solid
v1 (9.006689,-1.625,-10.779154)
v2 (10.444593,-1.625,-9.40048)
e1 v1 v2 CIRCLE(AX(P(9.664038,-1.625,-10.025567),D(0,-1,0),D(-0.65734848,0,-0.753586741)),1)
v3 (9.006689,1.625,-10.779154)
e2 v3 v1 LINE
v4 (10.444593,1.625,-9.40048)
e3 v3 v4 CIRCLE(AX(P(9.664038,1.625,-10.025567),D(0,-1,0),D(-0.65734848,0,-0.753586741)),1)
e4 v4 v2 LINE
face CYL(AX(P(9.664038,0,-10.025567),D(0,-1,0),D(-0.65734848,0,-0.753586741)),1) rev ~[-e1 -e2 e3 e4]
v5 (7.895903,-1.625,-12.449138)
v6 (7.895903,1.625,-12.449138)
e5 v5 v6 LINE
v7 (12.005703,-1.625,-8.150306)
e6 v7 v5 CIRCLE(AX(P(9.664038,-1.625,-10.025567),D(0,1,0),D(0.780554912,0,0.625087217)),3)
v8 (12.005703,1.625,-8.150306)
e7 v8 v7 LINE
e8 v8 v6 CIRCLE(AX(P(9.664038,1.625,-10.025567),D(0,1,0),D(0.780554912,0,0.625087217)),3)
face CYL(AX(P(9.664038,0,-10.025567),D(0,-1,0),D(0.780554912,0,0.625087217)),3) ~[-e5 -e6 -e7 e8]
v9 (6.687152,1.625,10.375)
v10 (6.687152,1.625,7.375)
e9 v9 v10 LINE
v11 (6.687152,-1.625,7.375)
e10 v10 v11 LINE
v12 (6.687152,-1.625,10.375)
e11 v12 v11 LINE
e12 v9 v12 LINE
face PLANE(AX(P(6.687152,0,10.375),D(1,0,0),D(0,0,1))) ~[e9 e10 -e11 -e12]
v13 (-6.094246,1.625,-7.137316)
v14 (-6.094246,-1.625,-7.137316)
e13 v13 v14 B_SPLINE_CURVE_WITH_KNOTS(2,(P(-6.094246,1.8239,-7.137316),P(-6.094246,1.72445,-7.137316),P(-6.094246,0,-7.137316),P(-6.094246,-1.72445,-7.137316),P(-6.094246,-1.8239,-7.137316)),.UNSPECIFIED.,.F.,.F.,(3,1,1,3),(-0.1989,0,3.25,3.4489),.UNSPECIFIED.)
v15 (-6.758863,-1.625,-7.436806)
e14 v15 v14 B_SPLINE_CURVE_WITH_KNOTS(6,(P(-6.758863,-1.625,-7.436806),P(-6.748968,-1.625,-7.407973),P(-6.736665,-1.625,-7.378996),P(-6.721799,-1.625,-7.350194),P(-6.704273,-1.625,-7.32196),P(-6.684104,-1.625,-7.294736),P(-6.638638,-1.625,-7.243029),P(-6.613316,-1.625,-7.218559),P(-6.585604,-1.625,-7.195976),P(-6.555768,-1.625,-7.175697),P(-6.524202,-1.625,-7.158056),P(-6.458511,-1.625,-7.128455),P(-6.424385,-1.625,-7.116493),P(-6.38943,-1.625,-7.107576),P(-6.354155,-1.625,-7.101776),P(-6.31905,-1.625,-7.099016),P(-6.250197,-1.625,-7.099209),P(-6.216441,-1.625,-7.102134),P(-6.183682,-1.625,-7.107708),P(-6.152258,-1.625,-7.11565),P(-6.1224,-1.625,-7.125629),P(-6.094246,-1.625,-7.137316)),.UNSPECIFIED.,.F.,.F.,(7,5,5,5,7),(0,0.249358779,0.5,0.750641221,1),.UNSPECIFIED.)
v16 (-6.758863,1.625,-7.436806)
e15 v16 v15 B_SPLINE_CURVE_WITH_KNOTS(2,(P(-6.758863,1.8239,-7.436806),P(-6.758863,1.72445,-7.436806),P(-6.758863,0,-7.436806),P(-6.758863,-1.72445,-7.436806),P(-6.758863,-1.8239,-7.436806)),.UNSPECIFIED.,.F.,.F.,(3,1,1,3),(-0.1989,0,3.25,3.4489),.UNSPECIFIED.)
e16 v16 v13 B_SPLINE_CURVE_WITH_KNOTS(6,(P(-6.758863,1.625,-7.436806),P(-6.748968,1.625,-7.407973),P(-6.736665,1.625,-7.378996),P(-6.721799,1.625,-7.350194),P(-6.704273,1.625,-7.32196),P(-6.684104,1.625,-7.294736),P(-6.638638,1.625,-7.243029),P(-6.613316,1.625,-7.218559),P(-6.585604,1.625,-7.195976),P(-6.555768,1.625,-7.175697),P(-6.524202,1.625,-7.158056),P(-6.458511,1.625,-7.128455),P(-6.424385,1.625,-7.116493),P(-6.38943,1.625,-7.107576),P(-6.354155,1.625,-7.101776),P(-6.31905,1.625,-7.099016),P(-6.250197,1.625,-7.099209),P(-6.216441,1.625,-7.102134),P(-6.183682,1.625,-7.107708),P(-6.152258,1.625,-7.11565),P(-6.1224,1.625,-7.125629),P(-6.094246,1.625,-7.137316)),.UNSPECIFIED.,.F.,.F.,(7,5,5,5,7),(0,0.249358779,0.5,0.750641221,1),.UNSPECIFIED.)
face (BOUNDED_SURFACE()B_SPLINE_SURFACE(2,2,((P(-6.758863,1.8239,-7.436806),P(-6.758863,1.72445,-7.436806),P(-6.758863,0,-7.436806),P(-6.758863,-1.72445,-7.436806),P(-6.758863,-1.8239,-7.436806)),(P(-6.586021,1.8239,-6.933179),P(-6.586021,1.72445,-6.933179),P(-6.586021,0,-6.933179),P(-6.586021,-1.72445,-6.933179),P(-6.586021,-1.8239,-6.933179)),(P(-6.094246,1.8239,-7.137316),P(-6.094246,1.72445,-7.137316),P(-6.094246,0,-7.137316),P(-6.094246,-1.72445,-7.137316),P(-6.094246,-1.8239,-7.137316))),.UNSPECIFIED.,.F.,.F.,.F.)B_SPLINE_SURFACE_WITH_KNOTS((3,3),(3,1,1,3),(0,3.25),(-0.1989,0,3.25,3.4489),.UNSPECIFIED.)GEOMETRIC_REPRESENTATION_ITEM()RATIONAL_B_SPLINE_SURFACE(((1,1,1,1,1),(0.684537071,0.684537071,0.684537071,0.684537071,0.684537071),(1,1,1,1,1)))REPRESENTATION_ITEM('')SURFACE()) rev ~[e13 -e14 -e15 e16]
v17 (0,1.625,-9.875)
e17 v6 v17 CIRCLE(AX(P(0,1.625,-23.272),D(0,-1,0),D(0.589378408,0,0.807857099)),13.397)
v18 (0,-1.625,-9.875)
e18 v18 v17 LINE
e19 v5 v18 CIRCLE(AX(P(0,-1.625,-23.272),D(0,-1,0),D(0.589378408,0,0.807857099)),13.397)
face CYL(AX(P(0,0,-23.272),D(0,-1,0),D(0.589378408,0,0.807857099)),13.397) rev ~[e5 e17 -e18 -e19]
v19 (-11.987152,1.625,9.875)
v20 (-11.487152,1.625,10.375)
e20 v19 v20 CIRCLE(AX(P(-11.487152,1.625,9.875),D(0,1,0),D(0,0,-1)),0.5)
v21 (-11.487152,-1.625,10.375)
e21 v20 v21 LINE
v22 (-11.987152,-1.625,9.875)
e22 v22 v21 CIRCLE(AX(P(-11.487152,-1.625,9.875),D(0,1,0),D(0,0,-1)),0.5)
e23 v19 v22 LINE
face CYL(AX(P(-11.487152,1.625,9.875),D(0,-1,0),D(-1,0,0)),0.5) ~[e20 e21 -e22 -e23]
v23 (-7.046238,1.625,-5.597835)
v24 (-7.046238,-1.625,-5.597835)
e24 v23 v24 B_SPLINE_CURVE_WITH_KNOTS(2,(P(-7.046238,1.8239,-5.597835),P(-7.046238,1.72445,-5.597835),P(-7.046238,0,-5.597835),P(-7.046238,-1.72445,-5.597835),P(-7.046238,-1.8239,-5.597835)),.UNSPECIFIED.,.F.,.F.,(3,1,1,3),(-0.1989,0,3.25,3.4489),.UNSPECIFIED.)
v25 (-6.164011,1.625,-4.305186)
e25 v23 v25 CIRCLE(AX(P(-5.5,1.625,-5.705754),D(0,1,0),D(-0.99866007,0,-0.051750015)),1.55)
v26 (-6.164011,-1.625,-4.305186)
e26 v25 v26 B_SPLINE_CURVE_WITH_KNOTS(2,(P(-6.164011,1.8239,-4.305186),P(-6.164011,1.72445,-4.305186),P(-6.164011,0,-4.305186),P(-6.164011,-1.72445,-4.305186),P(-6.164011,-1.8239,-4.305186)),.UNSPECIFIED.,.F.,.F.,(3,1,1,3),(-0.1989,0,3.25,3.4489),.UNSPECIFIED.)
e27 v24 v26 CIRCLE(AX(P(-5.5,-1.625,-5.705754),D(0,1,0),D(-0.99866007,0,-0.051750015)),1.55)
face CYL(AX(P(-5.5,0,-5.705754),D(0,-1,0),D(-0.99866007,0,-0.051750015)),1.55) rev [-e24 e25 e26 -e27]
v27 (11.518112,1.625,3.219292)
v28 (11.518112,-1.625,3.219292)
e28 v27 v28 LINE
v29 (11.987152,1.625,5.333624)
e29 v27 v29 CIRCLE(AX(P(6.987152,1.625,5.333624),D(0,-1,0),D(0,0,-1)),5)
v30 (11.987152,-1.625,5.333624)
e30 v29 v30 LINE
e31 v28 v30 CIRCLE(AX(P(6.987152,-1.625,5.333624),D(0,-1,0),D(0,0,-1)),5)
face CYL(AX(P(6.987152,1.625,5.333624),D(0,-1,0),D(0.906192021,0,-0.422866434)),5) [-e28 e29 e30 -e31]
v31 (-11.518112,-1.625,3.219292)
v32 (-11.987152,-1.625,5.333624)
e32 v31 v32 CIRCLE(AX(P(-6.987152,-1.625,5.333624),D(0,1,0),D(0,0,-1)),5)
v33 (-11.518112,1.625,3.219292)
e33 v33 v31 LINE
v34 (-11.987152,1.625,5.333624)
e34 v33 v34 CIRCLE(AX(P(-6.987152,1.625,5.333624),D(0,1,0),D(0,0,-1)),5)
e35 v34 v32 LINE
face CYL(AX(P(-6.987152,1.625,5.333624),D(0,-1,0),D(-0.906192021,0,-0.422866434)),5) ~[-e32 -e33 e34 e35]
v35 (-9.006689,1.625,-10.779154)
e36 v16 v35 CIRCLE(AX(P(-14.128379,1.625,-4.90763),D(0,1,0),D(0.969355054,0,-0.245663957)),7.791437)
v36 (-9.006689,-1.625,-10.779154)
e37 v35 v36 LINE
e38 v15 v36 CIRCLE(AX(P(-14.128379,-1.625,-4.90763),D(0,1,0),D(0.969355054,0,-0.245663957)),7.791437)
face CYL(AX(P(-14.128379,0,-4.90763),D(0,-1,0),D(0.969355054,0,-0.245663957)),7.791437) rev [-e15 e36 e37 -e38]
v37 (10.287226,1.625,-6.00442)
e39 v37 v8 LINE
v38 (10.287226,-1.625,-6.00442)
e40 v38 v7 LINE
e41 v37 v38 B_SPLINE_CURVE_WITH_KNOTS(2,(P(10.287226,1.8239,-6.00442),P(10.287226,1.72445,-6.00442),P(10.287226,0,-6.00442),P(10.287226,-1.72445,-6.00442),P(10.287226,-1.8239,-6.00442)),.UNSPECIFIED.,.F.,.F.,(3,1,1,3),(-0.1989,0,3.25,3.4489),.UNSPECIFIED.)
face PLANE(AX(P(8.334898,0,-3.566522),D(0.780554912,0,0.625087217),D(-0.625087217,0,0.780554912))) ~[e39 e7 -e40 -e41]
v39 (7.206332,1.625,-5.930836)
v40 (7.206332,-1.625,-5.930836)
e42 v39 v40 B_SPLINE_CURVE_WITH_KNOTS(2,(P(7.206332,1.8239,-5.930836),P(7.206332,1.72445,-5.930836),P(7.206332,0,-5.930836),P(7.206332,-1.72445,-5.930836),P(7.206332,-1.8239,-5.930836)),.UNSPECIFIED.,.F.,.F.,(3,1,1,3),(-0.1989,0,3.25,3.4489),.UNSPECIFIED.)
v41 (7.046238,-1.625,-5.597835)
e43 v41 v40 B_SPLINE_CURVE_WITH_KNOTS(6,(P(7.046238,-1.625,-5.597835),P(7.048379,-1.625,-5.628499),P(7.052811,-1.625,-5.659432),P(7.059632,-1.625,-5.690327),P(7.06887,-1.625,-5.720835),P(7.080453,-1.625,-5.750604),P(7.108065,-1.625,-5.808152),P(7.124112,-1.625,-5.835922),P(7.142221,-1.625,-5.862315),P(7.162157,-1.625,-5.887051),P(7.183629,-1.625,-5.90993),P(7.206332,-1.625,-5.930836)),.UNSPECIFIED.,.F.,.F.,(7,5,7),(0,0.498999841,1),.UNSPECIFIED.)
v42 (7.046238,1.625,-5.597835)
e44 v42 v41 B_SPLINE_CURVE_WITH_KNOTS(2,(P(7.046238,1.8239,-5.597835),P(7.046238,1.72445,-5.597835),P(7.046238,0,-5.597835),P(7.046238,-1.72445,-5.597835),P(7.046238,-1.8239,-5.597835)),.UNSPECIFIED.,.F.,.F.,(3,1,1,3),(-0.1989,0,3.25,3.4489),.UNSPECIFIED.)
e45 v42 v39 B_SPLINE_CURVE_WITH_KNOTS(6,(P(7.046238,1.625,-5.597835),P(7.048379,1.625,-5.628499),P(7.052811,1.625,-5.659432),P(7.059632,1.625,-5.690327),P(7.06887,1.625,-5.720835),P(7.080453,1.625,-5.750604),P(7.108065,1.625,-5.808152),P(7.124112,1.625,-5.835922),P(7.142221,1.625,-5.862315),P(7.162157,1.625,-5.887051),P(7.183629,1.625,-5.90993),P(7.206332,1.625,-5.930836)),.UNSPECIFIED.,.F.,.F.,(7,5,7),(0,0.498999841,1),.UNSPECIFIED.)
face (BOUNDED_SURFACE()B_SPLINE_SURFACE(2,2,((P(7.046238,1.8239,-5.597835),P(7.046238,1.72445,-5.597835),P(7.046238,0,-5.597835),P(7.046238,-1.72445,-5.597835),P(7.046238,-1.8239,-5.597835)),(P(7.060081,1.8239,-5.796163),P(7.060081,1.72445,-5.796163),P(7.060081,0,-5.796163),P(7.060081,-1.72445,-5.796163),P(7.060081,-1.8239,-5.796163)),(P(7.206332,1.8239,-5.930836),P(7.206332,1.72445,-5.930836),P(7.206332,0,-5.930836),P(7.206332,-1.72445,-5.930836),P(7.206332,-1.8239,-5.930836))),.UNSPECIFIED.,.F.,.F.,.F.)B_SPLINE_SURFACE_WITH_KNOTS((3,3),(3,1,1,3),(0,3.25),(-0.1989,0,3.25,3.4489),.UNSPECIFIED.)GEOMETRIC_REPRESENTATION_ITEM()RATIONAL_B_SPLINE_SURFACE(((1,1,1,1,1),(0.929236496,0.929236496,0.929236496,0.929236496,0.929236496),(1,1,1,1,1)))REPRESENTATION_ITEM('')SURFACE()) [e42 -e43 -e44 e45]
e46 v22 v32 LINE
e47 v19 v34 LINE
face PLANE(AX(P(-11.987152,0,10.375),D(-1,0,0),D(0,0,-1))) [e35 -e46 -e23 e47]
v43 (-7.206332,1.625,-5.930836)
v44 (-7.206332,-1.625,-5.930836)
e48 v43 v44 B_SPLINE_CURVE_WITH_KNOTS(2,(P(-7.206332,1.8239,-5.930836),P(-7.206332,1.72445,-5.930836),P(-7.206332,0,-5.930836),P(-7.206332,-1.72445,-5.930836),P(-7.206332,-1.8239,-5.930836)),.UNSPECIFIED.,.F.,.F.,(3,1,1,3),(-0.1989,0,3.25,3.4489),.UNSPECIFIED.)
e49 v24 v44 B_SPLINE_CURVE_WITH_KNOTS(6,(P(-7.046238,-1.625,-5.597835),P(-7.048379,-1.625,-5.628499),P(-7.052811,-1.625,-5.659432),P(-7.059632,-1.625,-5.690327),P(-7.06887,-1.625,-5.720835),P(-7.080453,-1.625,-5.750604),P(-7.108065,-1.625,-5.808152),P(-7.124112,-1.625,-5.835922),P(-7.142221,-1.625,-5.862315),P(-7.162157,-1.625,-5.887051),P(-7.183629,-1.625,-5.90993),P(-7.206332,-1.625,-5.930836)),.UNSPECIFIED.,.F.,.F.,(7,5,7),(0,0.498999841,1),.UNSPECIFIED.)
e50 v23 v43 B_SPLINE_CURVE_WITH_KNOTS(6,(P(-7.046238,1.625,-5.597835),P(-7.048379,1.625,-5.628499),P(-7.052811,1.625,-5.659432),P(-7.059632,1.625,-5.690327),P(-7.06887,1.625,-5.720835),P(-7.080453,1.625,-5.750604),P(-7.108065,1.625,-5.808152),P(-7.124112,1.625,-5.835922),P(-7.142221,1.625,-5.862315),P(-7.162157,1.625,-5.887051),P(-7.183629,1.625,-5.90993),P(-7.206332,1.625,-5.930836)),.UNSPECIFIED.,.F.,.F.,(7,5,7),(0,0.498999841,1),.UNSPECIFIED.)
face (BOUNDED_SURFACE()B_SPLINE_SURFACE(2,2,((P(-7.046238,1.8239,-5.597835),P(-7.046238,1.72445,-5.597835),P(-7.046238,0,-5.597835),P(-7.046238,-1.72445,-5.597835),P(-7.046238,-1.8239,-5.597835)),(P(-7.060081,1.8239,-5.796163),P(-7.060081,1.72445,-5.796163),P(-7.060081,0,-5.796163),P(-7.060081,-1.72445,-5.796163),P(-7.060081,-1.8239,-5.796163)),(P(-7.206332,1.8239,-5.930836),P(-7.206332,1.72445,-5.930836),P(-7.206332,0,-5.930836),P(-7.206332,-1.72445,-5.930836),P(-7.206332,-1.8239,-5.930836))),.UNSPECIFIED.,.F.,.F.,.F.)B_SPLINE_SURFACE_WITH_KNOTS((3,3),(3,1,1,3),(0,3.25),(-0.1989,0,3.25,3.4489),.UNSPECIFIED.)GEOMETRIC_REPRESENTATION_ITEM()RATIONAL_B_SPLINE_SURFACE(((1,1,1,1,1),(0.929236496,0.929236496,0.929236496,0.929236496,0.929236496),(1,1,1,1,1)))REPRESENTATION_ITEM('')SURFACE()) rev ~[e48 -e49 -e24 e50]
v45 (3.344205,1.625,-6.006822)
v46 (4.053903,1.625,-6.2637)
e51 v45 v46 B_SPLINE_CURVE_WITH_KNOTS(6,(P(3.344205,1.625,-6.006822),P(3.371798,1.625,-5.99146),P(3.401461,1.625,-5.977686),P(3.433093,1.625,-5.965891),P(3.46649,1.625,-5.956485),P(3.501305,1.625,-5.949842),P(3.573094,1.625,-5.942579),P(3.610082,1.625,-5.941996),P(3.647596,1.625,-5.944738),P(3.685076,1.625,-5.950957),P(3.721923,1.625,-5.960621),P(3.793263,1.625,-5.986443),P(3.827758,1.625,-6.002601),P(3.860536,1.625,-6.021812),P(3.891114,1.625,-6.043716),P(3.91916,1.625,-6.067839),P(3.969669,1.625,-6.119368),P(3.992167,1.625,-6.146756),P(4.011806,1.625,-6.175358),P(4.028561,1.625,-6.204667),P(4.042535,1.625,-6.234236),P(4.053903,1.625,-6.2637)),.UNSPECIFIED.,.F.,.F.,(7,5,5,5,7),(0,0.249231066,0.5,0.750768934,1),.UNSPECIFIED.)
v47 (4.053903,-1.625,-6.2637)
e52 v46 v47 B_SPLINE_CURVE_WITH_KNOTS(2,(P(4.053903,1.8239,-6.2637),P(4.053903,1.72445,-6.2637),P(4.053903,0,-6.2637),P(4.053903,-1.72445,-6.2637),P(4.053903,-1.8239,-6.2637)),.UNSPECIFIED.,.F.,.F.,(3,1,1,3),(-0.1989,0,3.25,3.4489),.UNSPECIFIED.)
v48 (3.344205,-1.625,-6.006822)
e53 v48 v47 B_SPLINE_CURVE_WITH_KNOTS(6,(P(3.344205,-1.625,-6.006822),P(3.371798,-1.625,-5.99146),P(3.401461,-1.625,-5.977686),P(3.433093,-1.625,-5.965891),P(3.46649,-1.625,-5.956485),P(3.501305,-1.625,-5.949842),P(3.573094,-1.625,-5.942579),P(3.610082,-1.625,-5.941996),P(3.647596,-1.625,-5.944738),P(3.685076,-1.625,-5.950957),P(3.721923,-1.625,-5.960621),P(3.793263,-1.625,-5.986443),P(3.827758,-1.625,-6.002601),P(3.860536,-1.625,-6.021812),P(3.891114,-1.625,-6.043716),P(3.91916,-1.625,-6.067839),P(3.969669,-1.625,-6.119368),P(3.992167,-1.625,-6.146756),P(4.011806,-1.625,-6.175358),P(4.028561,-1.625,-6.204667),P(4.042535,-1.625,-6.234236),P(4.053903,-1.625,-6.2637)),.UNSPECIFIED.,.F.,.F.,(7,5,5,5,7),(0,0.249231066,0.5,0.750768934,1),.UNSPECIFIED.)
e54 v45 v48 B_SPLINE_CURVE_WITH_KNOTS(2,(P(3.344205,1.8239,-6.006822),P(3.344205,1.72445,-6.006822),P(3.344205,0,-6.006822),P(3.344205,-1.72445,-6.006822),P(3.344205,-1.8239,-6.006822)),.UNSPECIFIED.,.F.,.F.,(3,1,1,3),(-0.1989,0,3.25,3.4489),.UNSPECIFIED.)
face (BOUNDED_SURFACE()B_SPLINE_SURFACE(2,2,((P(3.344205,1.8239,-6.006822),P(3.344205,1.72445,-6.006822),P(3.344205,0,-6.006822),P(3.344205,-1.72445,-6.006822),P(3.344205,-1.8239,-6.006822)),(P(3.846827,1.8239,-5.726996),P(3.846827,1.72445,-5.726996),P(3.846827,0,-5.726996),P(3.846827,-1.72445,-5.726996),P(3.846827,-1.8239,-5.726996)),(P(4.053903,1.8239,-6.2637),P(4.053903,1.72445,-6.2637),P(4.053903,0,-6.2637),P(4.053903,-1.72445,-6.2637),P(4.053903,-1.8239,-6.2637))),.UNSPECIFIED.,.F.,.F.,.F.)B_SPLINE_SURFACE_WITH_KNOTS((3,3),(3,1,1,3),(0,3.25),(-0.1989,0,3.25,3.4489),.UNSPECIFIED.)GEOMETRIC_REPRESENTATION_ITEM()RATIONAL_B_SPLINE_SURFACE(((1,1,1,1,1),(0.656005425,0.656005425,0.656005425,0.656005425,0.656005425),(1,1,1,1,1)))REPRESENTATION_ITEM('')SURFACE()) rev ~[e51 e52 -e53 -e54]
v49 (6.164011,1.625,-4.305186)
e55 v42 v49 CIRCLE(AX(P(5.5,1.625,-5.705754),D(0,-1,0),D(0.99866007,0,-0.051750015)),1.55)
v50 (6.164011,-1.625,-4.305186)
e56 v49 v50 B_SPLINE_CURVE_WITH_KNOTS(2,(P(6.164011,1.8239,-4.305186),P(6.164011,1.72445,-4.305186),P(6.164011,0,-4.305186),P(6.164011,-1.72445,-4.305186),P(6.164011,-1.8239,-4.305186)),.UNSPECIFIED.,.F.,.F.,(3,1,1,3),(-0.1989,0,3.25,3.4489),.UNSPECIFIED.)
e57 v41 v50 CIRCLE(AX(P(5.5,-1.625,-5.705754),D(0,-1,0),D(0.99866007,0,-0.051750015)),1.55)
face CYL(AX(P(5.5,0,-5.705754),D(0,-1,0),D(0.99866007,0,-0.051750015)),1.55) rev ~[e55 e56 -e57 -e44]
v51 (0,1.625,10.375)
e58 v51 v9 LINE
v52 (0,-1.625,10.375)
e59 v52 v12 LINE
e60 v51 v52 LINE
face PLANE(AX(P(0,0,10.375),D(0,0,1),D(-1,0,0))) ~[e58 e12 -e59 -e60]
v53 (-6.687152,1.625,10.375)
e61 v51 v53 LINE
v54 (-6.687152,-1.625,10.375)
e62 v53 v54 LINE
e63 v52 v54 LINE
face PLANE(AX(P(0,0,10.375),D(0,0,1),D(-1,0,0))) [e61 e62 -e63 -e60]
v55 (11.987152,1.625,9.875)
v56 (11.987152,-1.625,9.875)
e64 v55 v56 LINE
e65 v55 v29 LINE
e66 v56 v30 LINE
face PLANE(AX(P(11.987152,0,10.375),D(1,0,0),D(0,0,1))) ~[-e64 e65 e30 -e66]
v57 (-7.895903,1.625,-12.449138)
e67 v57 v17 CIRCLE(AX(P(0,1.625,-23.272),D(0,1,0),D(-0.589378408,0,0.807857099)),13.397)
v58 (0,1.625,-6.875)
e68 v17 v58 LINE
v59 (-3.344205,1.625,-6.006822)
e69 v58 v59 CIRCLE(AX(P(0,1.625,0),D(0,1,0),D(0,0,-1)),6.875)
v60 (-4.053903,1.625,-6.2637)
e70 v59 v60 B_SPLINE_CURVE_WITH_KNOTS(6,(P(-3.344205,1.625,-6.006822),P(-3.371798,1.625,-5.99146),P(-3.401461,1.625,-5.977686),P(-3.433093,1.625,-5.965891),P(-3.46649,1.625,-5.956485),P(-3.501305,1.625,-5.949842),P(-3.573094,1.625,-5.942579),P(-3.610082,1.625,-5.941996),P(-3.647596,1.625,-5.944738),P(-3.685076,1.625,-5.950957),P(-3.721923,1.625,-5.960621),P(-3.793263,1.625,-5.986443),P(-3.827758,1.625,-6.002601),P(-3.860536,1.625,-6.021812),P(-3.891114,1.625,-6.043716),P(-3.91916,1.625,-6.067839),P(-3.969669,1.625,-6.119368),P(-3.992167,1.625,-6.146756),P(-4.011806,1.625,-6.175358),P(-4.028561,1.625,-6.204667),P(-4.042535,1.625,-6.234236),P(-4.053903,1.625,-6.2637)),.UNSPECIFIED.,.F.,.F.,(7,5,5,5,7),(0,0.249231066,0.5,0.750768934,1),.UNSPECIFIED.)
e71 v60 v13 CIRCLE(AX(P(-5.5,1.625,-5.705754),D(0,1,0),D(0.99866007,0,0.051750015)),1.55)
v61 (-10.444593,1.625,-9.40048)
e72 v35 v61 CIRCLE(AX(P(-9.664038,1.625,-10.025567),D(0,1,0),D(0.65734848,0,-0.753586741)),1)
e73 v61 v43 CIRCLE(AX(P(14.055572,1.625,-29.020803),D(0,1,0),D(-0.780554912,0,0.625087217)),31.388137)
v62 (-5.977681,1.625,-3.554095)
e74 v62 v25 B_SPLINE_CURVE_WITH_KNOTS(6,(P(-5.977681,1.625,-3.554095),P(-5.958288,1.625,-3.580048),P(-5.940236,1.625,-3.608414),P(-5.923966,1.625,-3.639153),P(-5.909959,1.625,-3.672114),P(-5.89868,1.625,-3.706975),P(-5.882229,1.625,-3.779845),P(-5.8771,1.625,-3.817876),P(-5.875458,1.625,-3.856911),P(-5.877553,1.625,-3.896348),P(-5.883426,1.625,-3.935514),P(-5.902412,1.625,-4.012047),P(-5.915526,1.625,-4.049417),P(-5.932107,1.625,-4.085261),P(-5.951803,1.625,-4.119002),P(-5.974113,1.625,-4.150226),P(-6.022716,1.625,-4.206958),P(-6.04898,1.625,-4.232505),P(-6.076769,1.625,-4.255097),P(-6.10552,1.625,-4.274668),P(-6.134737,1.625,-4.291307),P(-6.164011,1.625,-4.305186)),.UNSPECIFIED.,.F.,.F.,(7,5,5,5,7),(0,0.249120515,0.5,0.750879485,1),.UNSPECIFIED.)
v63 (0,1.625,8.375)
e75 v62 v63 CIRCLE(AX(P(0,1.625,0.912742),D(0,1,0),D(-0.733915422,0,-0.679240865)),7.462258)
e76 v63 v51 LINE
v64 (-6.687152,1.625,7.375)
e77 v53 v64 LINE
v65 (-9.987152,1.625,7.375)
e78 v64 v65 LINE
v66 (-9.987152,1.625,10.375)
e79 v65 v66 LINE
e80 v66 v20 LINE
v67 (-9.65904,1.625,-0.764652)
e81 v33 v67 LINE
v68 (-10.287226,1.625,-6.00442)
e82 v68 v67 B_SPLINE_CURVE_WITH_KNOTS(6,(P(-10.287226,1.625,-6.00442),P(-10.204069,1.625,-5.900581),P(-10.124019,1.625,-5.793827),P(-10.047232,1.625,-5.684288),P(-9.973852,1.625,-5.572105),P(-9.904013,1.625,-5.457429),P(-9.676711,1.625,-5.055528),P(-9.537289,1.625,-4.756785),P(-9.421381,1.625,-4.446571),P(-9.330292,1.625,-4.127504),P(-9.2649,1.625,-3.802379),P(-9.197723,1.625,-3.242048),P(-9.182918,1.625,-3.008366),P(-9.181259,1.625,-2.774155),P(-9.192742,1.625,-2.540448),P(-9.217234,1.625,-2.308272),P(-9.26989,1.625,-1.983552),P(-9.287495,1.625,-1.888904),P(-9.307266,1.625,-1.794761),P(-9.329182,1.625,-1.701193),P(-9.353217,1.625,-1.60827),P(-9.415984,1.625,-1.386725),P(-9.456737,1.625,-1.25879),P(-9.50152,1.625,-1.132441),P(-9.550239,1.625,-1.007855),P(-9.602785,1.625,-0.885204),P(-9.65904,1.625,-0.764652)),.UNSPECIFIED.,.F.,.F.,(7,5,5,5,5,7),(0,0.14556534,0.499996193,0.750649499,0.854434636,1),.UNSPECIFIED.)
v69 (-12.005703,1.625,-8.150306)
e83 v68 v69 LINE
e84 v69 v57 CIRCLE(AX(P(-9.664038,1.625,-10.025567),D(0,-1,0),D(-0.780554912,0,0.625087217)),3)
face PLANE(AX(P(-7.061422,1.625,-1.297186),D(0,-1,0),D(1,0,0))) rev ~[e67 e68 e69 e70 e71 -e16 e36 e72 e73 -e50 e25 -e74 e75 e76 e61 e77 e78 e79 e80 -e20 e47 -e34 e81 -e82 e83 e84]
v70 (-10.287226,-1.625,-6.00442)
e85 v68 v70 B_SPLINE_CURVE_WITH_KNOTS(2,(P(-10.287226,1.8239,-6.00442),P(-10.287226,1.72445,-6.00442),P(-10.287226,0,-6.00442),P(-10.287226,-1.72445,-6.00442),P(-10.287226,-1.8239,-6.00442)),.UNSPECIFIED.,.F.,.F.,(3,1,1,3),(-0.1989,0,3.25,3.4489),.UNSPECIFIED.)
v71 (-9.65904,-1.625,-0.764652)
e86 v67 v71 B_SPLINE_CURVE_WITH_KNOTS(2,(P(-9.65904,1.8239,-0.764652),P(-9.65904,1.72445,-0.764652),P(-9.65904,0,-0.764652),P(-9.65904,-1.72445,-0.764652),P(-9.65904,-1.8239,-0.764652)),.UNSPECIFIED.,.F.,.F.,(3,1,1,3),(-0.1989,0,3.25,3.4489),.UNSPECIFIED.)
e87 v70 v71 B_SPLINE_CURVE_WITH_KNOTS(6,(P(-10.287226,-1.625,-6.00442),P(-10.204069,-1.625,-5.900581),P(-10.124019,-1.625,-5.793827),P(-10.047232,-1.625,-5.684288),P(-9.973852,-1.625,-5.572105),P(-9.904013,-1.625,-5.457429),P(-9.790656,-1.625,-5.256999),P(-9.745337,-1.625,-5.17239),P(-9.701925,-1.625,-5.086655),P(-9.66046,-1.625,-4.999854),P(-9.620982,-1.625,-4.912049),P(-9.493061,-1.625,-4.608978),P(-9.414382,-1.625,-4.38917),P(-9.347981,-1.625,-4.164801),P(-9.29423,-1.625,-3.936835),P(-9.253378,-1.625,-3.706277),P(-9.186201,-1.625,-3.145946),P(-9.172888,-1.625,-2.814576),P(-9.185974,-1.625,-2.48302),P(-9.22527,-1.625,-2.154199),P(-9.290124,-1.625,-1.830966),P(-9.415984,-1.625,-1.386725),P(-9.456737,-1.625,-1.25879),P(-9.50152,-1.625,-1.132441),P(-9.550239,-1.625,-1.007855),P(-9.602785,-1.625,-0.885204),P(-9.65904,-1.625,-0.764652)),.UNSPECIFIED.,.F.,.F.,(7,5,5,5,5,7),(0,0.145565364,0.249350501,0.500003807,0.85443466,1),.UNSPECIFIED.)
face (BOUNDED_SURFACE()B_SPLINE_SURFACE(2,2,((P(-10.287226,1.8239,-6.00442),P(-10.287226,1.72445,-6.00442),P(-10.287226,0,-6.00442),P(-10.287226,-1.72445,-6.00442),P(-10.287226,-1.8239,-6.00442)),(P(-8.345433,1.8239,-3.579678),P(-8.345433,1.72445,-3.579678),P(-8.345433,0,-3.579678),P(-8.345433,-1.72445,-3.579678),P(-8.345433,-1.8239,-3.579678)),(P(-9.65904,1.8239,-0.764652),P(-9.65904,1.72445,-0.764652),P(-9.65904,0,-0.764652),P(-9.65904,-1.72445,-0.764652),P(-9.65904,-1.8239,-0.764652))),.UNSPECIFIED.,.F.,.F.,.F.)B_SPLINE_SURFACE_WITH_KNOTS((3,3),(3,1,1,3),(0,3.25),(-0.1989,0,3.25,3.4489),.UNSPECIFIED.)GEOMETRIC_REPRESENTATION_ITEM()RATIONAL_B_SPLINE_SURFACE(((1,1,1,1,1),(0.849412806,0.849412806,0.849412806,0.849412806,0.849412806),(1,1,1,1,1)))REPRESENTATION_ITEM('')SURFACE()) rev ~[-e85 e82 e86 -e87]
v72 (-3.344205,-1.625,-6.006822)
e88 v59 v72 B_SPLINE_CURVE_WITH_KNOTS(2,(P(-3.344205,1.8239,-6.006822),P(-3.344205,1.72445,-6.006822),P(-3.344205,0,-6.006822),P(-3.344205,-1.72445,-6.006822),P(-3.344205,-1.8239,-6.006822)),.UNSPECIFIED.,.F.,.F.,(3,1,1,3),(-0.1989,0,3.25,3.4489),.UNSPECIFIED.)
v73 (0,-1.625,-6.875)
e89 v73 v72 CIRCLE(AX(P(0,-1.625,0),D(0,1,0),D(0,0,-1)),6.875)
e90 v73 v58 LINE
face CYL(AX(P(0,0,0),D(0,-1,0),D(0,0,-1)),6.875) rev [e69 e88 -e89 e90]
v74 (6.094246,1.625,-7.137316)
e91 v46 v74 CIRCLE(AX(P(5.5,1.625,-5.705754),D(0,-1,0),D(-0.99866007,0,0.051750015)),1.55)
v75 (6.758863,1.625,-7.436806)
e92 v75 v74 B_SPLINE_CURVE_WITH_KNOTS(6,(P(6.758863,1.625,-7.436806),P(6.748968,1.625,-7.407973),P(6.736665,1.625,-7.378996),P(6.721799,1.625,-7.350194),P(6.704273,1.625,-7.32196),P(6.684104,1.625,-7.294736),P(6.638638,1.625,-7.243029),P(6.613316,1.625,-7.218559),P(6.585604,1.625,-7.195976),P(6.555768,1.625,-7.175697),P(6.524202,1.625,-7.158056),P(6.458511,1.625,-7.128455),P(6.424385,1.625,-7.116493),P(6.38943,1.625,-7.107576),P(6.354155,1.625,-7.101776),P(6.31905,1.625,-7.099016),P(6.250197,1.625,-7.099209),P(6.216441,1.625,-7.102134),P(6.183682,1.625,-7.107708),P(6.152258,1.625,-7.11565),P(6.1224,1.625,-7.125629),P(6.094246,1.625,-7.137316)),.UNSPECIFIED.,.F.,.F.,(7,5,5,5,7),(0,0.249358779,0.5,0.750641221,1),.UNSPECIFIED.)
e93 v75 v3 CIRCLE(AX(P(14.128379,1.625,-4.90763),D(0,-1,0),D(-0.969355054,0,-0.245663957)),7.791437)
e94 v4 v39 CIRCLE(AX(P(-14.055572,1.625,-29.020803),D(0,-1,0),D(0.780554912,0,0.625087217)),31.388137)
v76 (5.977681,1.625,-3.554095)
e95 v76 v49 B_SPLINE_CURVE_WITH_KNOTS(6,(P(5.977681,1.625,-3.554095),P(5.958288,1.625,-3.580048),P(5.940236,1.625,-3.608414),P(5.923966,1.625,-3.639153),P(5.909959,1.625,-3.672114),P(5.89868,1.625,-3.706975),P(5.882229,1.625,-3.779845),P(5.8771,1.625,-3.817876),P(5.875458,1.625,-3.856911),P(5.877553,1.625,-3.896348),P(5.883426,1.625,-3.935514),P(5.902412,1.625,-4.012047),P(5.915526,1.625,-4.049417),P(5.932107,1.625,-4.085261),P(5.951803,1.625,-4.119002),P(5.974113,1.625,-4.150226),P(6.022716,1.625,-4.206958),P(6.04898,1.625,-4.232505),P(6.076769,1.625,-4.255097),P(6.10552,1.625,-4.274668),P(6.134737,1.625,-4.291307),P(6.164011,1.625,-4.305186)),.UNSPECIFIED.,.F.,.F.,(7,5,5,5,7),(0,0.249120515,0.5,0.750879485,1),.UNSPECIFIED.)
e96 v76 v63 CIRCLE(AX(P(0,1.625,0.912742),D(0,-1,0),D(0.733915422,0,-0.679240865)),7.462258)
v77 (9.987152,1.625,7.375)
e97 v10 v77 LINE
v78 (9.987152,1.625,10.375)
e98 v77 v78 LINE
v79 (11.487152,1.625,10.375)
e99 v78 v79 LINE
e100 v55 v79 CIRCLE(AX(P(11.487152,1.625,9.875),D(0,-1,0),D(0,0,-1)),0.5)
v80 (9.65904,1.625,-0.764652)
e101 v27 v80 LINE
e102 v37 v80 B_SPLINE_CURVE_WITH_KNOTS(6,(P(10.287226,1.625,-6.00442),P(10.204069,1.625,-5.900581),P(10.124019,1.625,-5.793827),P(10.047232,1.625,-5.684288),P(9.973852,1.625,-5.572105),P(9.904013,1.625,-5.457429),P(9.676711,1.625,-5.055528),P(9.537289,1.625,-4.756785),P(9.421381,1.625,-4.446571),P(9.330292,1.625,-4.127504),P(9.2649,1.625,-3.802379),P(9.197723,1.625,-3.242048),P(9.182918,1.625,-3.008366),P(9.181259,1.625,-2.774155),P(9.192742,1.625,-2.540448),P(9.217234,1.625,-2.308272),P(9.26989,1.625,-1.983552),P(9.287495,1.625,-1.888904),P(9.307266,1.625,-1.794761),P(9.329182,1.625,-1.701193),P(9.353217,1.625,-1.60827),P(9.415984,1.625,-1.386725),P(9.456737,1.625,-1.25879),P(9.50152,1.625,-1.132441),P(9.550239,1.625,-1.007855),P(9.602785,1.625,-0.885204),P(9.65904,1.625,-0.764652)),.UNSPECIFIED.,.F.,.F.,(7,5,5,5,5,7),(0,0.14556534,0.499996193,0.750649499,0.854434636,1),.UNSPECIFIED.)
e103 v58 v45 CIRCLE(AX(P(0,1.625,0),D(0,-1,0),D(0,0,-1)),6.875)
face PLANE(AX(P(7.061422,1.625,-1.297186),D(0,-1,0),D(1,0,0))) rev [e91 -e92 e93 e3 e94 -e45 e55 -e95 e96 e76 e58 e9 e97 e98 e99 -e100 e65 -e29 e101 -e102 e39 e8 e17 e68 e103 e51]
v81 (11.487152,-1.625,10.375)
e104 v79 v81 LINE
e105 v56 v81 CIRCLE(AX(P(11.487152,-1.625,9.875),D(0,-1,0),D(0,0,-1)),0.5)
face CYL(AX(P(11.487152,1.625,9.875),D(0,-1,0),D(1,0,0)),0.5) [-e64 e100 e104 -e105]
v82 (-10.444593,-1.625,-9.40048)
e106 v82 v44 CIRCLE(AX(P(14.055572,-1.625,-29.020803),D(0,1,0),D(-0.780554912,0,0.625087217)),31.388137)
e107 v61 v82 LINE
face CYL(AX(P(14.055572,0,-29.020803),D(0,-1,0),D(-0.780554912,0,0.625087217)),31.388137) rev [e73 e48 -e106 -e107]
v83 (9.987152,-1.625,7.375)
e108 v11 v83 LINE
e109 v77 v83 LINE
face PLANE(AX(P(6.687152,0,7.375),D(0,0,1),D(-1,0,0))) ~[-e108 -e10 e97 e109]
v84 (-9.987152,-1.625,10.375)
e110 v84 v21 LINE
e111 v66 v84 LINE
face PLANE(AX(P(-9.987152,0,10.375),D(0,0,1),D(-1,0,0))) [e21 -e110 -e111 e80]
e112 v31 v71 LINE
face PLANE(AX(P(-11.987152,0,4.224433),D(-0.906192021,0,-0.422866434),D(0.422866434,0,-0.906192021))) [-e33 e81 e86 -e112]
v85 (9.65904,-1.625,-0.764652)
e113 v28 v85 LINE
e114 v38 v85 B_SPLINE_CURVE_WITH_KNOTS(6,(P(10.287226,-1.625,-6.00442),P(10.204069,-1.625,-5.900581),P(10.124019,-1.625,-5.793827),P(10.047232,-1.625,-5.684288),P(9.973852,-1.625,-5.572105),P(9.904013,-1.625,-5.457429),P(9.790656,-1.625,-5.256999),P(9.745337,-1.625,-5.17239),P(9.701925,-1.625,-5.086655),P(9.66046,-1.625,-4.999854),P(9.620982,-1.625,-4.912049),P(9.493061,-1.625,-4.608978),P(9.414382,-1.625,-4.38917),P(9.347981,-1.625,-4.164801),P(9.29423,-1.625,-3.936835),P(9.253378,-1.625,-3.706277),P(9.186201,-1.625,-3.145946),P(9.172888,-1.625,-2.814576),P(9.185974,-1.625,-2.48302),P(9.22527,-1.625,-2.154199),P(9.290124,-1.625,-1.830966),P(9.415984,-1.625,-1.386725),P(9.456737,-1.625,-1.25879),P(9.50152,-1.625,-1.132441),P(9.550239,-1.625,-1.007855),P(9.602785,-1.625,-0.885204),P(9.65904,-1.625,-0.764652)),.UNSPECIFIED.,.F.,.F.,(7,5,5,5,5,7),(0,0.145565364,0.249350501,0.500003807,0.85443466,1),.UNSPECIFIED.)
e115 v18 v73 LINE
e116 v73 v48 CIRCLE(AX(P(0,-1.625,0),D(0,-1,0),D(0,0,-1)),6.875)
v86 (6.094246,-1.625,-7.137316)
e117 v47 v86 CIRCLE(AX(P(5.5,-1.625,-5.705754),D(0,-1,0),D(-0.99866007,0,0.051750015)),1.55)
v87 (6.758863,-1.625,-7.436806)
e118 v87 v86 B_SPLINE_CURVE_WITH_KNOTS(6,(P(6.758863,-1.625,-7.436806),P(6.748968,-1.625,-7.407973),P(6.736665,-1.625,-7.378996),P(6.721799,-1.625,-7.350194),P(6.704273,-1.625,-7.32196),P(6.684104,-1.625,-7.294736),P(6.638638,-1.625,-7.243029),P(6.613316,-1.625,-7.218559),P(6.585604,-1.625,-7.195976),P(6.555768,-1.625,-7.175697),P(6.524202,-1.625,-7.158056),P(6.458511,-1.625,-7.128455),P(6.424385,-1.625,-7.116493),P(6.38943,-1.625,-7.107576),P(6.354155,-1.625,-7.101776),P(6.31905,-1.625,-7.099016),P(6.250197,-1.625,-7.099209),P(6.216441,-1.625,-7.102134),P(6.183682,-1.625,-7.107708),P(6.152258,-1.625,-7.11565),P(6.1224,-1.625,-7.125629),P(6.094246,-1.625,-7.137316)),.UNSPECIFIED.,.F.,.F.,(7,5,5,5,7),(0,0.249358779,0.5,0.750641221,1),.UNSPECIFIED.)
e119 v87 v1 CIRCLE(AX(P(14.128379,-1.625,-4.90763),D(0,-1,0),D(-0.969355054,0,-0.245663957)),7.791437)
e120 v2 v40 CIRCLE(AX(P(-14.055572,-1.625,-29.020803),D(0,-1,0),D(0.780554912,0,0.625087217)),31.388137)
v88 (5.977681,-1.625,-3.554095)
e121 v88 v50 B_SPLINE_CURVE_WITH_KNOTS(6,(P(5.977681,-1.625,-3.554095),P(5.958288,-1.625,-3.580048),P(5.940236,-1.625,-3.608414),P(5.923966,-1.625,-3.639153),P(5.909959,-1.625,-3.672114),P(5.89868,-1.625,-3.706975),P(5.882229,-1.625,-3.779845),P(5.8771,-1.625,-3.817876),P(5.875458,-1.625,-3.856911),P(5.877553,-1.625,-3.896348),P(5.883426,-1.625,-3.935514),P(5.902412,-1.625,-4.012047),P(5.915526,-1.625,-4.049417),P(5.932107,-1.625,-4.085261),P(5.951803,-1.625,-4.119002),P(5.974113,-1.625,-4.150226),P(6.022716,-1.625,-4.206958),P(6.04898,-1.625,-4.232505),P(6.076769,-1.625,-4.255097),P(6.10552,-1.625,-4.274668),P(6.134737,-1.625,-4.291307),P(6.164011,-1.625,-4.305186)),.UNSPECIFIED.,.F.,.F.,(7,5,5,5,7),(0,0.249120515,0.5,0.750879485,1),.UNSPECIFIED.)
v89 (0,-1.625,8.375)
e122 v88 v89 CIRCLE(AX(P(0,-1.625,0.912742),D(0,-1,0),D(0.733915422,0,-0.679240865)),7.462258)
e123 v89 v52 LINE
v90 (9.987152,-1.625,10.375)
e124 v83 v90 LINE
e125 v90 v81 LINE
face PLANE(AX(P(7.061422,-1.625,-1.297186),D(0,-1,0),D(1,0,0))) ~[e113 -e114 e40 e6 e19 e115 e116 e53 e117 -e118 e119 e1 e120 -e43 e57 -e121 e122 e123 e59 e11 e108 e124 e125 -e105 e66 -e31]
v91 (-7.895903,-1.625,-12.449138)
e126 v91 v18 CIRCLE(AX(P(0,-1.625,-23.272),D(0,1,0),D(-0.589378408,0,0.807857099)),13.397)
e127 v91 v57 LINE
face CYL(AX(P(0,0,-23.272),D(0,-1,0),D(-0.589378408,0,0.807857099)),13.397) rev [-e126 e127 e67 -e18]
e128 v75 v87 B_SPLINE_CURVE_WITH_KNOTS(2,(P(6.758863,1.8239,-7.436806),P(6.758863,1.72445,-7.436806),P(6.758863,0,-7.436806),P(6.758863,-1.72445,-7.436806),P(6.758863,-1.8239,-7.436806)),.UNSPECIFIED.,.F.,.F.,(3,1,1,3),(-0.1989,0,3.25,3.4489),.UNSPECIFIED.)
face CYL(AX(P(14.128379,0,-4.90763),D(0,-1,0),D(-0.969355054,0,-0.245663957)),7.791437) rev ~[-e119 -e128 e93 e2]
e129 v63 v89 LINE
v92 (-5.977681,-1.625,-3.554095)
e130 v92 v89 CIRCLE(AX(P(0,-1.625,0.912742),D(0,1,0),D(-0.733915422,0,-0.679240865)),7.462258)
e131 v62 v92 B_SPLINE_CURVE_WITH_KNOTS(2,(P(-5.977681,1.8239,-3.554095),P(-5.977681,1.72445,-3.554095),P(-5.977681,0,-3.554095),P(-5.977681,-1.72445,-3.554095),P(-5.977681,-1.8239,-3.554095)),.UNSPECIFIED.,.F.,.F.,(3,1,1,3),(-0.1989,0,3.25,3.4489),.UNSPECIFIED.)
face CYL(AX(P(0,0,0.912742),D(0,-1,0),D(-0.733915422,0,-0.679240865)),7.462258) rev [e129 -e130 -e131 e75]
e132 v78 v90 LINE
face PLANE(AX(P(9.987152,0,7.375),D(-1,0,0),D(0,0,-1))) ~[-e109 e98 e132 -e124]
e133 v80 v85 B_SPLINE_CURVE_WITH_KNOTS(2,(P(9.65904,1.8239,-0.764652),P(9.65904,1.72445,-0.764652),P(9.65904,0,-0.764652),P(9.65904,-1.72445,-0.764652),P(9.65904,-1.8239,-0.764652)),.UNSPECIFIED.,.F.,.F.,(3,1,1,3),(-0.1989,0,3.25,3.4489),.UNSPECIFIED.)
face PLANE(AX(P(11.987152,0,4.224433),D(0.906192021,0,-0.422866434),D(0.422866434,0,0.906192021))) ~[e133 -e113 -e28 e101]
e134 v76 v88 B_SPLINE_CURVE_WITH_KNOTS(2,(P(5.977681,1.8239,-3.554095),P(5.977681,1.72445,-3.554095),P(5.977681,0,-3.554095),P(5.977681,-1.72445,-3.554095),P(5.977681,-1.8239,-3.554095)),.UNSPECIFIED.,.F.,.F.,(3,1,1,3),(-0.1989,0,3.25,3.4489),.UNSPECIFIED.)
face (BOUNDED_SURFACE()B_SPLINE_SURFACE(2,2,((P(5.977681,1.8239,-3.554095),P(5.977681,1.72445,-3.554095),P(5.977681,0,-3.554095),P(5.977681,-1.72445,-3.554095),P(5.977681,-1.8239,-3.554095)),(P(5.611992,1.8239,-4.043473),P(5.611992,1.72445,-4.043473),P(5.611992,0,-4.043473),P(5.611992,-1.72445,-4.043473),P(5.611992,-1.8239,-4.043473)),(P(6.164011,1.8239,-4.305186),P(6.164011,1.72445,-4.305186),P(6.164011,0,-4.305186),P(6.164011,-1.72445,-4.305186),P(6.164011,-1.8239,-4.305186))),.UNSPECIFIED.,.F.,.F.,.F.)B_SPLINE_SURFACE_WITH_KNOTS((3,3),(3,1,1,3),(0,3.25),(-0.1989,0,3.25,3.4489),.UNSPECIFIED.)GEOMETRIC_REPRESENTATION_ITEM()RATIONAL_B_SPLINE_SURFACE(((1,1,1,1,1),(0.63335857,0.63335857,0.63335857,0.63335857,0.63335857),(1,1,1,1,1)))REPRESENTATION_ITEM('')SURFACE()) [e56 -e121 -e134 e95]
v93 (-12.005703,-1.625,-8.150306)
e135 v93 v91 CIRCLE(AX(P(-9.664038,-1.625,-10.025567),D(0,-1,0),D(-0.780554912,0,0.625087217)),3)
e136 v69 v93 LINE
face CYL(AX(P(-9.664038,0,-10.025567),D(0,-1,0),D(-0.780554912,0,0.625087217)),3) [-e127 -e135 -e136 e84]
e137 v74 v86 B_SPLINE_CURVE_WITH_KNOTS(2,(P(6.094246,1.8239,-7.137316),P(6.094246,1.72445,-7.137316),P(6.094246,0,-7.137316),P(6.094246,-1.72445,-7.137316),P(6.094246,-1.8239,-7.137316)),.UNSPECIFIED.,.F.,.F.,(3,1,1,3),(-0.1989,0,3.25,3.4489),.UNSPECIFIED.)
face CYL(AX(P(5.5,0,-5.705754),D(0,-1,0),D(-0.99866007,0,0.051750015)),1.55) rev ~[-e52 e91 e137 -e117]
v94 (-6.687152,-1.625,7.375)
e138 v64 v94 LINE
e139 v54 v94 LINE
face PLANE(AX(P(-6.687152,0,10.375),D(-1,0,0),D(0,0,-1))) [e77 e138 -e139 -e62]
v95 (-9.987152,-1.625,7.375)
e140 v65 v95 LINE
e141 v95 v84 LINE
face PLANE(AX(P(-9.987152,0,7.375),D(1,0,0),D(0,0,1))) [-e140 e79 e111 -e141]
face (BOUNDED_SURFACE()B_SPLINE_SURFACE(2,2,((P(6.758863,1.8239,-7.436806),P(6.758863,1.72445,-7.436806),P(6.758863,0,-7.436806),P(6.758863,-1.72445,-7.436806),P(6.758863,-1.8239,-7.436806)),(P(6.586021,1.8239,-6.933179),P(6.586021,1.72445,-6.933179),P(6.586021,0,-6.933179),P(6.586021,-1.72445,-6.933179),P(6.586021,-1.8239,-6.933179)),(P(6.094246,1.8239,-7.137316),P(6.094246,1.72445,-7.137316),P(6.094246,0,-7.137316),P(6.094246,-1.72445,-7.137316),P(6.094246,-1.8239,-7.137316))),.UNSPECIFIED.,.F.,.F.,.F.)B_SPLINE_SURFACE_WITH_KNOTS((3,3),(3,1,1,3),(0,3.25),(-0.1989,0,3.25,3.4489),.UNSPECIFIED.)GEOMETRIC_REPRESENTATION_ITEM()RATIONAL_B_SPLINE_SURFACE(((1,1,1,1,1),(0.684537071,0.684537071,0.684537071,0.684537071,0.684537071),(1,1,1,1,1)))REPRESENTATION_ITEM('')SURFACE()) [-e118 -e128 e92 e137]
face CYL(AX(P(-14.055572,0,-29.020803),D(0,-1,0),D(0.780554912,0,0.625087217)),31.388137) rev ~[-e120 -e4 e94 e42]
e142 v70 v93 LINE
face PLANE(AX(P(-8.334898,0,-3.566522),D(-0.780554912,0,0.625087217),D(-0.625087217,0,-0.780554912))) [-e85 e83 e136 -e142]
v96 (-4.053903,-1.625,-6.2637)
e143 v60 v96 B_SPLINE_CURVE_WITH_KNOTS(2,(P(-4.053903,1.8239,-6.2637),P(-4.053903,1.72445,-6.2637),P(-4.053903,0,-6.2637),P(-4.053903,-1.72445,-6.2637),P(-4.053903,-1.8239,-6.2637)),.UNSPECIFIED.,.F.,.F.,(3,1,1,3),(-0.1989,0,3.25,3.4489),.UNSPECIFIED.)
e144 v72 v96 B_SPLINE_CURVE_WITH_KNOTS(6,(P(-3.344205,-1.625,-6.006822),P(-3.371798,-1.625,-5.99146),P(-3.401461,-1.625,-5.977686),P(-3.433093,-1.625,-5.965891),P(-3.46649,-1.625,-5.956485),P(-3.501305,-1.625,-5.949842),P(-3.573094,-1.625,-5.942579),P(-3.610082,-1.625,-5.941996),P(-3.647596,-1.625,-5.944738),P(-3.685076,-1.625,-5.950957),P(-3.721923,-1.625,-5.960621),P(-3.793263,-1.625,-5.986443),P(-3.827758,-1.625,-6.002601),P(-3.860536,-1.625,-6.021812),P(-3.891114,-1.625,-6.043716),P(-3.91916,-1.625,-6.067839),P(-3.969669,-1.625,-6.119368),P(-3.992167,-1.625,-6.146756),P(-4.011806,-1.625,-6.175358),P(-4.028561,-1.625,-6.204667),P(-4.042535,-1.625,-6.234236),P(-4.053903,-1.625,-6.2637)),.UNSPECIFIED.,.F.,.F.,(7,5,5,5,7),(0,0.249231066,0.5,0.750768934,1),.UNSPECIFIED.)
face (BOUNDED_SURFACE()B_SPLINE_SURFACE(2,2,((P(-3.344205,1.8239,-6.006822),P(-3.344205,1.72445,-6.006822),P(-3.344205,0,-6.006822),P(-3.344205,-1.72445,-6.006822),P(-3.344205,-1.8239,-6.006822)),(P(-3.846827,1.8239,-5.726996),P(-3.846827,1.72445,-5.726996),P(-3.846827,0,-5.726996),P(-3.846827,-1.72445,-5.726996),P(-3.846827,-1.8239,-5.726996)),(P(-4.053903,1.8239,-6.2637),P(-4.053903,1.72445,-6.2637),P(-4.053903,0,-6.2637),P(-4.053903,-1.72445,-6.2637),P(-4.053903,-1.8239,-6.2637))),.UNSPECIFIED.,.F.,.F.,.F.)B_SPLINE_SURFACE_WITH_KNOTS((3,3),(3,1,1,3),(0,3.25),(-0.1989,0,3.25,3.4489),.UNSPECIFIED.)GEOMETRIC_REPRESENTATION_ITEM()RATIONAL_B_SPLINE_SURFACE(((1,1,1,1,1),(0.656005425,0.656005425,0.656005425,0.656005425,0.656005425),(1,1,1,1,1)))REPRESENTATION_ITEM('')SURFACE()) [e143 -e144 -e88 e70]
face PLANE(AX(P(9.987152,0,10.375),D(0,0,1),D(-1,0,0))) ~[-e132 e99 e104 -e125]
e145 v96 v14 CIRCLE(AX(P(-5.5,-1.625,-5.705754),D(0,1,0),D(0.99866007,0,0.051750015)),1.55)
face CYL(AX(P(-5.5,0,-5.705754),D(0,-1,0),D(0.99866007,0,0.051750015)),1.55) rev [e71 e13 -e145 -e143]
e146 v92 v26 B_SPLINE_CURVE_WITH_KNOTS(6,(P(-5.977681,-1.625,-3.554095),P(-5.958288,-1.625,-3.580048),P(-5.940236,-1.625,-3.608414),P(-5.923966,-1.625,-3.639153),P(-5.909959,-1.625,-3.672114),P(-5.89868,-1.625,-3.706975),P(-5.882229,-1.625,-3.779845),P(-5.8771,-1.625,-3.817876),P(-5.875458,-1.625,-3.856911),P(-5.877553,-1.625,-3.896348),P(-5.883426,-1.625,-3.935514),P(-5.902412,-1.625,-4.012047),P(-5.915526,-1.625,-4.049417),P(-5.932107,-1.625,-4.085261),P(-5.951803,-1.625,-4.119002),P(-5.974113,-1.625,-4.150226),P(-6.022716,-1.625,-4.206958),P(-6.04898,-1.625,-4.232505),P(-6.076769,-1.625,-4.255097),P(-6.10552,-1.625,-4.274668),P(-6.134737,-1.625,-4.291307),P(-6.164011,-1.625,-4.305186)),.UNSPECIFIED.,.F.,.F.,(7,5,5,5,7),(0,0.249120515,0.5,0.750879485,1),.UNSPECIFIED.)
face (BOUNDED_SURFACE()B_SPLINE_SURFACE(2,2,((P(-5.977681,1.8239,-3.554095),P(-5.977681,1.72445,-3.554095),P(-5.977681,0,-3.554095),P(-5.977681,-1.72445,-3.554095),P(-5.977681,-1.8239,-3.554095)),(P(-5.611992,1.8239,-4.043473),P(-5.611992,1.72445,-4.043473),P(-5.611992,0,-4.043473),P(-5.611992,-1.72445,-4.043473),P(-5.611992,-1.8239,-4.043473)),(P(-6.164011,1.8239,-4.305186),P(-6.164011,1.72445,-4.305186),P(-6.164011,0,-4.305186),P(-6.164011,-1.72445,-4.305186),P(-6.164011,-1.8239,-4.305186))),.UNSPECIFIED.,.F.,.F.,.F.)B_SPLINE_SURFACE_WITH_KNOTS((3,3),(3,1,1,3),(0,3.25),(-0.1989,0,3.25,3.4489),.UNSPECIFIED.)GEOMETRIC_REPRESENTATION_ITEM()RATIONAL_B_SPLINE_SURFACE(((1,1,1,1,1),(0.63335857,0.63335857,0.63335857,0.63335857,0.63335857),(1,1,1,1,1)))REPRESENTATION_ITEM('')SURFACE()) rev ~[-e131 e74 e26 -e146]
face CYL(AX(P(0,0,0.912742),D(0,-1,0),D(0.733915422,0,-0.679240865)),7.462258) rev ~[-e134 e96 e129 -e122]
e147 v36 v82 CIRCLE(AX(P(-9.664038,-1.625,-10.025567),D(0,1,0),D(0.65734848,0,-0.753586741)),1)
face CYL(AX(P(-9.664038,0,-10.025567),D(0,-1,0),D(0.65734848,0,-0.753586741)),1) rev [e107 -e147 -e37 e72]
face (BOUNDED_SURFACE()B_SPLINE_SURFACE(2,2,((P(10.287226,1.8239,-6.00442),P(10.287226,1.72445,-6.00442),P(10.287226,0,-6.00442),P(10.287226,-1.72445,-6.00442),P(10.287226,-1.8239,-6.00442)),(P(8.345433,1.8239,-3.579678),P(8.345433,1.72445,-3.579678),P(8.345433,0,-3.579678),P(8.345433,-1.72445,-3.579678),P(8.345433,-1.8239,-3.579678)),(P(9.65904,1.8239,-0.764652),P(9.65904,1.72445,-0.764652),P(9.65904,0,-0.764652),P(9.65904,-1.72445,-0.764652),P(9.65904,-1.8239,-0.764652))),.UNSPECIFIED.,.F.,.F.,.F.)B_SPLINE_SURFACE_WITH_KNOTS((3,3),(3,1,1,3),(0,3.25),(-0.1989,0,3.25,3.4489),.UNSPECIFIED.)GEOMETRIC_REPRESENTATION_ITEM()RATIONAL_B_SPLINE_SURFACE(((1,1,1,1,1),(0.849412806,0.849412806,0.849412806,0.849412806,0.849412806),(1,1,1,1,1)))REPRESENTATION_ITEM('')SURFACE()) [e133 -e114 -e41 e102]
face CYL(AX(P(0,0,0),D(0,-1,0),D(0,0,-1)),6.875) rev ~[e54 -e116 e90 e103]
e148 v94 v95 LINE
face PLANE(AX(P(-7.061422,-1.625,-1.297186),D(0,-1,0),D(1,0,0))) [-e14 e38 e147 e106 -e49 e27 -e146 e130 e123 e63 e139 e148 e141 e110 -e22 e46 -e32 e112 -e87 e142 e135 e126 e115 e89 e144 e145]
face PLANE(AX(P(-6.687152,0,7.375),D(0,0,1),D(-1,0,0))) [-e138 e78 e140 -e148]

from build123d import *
from build123d import SkipClean  # not in build123d's __all__

# Parameters (mm, degrees)
F2_DEPTH = 1.625
F3_R     = 0.5
F4_R     = 5


with BuildPart() as f2:
    # F1 (on Front) → F2 (new body, symmetric)
    with BuildSketch(Plane.XZ):
        with BuildLine():
            ThreePointArc((0, -6.875), (-2.0724417463, -6.5551971906), (-3.9520768911, -5.6255411515))
            ThreePointArc((-3.9520768911, -5.6255411515), (-4.8570002775, -7.1160909953), (-6.5757097792, -6.8217054979))
            ThreePointArc((-6.5757097792, -6.8217054979), (-7.4894639741, -8.9857797177), (-9.0066893746, -10.7791539234))
            ThreePointArc((-9.0066893746, -10.7791539234), (-10.3561219729, -10.7473840389), (-10.4445927673, -9.400479966))
            ThreePointArc((-10.4445927673, -9.400479966), (-8.8177667586, -7.5260240462), (-7.0479231089, -5.7859661986))
            ThreePointArc((-7.0479231089, -5.7859661986), (-6.6159518229, -4.6300438958), (-5.4766665535, -4.1559293139))
            ThreePointArc((-5.4766665535, -4.1559293139), (-6.837727437, 3.9011833784), (0, 8.375))
            Line((0, 8.375), (0, 10.375))
            Line((0, 10.375), (-6.6871520114, 10.375))
            Line((-6.6871520114, 10.375), (-6.6871520114, 7.375))
            Line((-6.6871520114, 7.375), (-9.9871520114, 7.375))
            Line((-9.9871520114, 7.375), (-9.9871520114, 10.375))
            Line((-9.9871520114, 10.375), (-11.9871520114, 10.375))
            Line((-11.9871520114, 10.375), (-11.9871520114, 4.2244328171))
            Line((-11.9871520114, 4.2244328171), (-8.5746230978, -3.0885299193))
            ThreePointArc((-8.5746230978, -3.0885299193), (-8.458137965, -3.3292198832), (-8.3348983214, -3.5665222959))
            Line((-8.3348983214, -3.5665222959), (-12.0057025921, -8.1503055323))
            ThreePointArc((-12.0057025921, -8.1503055323), (-11.8324993376, -12.098674705), (-7.8959026306, -12.4491384793))
            ThreePointArc((-7.8959026306, -12.4491384793), (-4.1524531082, -10.534781214), (0, -9.875))
            Line((0, -9.875), (0, -6.875))
        make_face()
    extrude(amount=F2_DEPTH, both=True)

    # F3
    f3_edges = [f2.edges().sort_by_distance(p)[0] for p in [
        (-3.952077, 0, -5.625541),
        (-7.047923, 0, -5.785966),
        (-11.987152, 0, 10.375),
        (-5.476667, 0, -4.155929),
        (-6.57571, 0, -6.821705),
    ]]
    fillet(f3_edges, radius=F3_R)

    # F4
    f4_edges = [f2.edges().sort_by_distance(p)[0] for p in [
        (-8.334898, 0, -3.566522),
        (-11.987152, 0, 4.224433),
    ]]
    fillet(f4_edges, radius=F4_R)

    # F5: F2 across plane


with BuildPart() as f2_1:
    add(f2.part, clean=False)
    with SkipClean():  # cleaning this boolean's faces spoils the solid; the shape is the same uncleaned
        add(f2.part.mirror(Plane.YZ), clean=False)


solid = f2_1.part
